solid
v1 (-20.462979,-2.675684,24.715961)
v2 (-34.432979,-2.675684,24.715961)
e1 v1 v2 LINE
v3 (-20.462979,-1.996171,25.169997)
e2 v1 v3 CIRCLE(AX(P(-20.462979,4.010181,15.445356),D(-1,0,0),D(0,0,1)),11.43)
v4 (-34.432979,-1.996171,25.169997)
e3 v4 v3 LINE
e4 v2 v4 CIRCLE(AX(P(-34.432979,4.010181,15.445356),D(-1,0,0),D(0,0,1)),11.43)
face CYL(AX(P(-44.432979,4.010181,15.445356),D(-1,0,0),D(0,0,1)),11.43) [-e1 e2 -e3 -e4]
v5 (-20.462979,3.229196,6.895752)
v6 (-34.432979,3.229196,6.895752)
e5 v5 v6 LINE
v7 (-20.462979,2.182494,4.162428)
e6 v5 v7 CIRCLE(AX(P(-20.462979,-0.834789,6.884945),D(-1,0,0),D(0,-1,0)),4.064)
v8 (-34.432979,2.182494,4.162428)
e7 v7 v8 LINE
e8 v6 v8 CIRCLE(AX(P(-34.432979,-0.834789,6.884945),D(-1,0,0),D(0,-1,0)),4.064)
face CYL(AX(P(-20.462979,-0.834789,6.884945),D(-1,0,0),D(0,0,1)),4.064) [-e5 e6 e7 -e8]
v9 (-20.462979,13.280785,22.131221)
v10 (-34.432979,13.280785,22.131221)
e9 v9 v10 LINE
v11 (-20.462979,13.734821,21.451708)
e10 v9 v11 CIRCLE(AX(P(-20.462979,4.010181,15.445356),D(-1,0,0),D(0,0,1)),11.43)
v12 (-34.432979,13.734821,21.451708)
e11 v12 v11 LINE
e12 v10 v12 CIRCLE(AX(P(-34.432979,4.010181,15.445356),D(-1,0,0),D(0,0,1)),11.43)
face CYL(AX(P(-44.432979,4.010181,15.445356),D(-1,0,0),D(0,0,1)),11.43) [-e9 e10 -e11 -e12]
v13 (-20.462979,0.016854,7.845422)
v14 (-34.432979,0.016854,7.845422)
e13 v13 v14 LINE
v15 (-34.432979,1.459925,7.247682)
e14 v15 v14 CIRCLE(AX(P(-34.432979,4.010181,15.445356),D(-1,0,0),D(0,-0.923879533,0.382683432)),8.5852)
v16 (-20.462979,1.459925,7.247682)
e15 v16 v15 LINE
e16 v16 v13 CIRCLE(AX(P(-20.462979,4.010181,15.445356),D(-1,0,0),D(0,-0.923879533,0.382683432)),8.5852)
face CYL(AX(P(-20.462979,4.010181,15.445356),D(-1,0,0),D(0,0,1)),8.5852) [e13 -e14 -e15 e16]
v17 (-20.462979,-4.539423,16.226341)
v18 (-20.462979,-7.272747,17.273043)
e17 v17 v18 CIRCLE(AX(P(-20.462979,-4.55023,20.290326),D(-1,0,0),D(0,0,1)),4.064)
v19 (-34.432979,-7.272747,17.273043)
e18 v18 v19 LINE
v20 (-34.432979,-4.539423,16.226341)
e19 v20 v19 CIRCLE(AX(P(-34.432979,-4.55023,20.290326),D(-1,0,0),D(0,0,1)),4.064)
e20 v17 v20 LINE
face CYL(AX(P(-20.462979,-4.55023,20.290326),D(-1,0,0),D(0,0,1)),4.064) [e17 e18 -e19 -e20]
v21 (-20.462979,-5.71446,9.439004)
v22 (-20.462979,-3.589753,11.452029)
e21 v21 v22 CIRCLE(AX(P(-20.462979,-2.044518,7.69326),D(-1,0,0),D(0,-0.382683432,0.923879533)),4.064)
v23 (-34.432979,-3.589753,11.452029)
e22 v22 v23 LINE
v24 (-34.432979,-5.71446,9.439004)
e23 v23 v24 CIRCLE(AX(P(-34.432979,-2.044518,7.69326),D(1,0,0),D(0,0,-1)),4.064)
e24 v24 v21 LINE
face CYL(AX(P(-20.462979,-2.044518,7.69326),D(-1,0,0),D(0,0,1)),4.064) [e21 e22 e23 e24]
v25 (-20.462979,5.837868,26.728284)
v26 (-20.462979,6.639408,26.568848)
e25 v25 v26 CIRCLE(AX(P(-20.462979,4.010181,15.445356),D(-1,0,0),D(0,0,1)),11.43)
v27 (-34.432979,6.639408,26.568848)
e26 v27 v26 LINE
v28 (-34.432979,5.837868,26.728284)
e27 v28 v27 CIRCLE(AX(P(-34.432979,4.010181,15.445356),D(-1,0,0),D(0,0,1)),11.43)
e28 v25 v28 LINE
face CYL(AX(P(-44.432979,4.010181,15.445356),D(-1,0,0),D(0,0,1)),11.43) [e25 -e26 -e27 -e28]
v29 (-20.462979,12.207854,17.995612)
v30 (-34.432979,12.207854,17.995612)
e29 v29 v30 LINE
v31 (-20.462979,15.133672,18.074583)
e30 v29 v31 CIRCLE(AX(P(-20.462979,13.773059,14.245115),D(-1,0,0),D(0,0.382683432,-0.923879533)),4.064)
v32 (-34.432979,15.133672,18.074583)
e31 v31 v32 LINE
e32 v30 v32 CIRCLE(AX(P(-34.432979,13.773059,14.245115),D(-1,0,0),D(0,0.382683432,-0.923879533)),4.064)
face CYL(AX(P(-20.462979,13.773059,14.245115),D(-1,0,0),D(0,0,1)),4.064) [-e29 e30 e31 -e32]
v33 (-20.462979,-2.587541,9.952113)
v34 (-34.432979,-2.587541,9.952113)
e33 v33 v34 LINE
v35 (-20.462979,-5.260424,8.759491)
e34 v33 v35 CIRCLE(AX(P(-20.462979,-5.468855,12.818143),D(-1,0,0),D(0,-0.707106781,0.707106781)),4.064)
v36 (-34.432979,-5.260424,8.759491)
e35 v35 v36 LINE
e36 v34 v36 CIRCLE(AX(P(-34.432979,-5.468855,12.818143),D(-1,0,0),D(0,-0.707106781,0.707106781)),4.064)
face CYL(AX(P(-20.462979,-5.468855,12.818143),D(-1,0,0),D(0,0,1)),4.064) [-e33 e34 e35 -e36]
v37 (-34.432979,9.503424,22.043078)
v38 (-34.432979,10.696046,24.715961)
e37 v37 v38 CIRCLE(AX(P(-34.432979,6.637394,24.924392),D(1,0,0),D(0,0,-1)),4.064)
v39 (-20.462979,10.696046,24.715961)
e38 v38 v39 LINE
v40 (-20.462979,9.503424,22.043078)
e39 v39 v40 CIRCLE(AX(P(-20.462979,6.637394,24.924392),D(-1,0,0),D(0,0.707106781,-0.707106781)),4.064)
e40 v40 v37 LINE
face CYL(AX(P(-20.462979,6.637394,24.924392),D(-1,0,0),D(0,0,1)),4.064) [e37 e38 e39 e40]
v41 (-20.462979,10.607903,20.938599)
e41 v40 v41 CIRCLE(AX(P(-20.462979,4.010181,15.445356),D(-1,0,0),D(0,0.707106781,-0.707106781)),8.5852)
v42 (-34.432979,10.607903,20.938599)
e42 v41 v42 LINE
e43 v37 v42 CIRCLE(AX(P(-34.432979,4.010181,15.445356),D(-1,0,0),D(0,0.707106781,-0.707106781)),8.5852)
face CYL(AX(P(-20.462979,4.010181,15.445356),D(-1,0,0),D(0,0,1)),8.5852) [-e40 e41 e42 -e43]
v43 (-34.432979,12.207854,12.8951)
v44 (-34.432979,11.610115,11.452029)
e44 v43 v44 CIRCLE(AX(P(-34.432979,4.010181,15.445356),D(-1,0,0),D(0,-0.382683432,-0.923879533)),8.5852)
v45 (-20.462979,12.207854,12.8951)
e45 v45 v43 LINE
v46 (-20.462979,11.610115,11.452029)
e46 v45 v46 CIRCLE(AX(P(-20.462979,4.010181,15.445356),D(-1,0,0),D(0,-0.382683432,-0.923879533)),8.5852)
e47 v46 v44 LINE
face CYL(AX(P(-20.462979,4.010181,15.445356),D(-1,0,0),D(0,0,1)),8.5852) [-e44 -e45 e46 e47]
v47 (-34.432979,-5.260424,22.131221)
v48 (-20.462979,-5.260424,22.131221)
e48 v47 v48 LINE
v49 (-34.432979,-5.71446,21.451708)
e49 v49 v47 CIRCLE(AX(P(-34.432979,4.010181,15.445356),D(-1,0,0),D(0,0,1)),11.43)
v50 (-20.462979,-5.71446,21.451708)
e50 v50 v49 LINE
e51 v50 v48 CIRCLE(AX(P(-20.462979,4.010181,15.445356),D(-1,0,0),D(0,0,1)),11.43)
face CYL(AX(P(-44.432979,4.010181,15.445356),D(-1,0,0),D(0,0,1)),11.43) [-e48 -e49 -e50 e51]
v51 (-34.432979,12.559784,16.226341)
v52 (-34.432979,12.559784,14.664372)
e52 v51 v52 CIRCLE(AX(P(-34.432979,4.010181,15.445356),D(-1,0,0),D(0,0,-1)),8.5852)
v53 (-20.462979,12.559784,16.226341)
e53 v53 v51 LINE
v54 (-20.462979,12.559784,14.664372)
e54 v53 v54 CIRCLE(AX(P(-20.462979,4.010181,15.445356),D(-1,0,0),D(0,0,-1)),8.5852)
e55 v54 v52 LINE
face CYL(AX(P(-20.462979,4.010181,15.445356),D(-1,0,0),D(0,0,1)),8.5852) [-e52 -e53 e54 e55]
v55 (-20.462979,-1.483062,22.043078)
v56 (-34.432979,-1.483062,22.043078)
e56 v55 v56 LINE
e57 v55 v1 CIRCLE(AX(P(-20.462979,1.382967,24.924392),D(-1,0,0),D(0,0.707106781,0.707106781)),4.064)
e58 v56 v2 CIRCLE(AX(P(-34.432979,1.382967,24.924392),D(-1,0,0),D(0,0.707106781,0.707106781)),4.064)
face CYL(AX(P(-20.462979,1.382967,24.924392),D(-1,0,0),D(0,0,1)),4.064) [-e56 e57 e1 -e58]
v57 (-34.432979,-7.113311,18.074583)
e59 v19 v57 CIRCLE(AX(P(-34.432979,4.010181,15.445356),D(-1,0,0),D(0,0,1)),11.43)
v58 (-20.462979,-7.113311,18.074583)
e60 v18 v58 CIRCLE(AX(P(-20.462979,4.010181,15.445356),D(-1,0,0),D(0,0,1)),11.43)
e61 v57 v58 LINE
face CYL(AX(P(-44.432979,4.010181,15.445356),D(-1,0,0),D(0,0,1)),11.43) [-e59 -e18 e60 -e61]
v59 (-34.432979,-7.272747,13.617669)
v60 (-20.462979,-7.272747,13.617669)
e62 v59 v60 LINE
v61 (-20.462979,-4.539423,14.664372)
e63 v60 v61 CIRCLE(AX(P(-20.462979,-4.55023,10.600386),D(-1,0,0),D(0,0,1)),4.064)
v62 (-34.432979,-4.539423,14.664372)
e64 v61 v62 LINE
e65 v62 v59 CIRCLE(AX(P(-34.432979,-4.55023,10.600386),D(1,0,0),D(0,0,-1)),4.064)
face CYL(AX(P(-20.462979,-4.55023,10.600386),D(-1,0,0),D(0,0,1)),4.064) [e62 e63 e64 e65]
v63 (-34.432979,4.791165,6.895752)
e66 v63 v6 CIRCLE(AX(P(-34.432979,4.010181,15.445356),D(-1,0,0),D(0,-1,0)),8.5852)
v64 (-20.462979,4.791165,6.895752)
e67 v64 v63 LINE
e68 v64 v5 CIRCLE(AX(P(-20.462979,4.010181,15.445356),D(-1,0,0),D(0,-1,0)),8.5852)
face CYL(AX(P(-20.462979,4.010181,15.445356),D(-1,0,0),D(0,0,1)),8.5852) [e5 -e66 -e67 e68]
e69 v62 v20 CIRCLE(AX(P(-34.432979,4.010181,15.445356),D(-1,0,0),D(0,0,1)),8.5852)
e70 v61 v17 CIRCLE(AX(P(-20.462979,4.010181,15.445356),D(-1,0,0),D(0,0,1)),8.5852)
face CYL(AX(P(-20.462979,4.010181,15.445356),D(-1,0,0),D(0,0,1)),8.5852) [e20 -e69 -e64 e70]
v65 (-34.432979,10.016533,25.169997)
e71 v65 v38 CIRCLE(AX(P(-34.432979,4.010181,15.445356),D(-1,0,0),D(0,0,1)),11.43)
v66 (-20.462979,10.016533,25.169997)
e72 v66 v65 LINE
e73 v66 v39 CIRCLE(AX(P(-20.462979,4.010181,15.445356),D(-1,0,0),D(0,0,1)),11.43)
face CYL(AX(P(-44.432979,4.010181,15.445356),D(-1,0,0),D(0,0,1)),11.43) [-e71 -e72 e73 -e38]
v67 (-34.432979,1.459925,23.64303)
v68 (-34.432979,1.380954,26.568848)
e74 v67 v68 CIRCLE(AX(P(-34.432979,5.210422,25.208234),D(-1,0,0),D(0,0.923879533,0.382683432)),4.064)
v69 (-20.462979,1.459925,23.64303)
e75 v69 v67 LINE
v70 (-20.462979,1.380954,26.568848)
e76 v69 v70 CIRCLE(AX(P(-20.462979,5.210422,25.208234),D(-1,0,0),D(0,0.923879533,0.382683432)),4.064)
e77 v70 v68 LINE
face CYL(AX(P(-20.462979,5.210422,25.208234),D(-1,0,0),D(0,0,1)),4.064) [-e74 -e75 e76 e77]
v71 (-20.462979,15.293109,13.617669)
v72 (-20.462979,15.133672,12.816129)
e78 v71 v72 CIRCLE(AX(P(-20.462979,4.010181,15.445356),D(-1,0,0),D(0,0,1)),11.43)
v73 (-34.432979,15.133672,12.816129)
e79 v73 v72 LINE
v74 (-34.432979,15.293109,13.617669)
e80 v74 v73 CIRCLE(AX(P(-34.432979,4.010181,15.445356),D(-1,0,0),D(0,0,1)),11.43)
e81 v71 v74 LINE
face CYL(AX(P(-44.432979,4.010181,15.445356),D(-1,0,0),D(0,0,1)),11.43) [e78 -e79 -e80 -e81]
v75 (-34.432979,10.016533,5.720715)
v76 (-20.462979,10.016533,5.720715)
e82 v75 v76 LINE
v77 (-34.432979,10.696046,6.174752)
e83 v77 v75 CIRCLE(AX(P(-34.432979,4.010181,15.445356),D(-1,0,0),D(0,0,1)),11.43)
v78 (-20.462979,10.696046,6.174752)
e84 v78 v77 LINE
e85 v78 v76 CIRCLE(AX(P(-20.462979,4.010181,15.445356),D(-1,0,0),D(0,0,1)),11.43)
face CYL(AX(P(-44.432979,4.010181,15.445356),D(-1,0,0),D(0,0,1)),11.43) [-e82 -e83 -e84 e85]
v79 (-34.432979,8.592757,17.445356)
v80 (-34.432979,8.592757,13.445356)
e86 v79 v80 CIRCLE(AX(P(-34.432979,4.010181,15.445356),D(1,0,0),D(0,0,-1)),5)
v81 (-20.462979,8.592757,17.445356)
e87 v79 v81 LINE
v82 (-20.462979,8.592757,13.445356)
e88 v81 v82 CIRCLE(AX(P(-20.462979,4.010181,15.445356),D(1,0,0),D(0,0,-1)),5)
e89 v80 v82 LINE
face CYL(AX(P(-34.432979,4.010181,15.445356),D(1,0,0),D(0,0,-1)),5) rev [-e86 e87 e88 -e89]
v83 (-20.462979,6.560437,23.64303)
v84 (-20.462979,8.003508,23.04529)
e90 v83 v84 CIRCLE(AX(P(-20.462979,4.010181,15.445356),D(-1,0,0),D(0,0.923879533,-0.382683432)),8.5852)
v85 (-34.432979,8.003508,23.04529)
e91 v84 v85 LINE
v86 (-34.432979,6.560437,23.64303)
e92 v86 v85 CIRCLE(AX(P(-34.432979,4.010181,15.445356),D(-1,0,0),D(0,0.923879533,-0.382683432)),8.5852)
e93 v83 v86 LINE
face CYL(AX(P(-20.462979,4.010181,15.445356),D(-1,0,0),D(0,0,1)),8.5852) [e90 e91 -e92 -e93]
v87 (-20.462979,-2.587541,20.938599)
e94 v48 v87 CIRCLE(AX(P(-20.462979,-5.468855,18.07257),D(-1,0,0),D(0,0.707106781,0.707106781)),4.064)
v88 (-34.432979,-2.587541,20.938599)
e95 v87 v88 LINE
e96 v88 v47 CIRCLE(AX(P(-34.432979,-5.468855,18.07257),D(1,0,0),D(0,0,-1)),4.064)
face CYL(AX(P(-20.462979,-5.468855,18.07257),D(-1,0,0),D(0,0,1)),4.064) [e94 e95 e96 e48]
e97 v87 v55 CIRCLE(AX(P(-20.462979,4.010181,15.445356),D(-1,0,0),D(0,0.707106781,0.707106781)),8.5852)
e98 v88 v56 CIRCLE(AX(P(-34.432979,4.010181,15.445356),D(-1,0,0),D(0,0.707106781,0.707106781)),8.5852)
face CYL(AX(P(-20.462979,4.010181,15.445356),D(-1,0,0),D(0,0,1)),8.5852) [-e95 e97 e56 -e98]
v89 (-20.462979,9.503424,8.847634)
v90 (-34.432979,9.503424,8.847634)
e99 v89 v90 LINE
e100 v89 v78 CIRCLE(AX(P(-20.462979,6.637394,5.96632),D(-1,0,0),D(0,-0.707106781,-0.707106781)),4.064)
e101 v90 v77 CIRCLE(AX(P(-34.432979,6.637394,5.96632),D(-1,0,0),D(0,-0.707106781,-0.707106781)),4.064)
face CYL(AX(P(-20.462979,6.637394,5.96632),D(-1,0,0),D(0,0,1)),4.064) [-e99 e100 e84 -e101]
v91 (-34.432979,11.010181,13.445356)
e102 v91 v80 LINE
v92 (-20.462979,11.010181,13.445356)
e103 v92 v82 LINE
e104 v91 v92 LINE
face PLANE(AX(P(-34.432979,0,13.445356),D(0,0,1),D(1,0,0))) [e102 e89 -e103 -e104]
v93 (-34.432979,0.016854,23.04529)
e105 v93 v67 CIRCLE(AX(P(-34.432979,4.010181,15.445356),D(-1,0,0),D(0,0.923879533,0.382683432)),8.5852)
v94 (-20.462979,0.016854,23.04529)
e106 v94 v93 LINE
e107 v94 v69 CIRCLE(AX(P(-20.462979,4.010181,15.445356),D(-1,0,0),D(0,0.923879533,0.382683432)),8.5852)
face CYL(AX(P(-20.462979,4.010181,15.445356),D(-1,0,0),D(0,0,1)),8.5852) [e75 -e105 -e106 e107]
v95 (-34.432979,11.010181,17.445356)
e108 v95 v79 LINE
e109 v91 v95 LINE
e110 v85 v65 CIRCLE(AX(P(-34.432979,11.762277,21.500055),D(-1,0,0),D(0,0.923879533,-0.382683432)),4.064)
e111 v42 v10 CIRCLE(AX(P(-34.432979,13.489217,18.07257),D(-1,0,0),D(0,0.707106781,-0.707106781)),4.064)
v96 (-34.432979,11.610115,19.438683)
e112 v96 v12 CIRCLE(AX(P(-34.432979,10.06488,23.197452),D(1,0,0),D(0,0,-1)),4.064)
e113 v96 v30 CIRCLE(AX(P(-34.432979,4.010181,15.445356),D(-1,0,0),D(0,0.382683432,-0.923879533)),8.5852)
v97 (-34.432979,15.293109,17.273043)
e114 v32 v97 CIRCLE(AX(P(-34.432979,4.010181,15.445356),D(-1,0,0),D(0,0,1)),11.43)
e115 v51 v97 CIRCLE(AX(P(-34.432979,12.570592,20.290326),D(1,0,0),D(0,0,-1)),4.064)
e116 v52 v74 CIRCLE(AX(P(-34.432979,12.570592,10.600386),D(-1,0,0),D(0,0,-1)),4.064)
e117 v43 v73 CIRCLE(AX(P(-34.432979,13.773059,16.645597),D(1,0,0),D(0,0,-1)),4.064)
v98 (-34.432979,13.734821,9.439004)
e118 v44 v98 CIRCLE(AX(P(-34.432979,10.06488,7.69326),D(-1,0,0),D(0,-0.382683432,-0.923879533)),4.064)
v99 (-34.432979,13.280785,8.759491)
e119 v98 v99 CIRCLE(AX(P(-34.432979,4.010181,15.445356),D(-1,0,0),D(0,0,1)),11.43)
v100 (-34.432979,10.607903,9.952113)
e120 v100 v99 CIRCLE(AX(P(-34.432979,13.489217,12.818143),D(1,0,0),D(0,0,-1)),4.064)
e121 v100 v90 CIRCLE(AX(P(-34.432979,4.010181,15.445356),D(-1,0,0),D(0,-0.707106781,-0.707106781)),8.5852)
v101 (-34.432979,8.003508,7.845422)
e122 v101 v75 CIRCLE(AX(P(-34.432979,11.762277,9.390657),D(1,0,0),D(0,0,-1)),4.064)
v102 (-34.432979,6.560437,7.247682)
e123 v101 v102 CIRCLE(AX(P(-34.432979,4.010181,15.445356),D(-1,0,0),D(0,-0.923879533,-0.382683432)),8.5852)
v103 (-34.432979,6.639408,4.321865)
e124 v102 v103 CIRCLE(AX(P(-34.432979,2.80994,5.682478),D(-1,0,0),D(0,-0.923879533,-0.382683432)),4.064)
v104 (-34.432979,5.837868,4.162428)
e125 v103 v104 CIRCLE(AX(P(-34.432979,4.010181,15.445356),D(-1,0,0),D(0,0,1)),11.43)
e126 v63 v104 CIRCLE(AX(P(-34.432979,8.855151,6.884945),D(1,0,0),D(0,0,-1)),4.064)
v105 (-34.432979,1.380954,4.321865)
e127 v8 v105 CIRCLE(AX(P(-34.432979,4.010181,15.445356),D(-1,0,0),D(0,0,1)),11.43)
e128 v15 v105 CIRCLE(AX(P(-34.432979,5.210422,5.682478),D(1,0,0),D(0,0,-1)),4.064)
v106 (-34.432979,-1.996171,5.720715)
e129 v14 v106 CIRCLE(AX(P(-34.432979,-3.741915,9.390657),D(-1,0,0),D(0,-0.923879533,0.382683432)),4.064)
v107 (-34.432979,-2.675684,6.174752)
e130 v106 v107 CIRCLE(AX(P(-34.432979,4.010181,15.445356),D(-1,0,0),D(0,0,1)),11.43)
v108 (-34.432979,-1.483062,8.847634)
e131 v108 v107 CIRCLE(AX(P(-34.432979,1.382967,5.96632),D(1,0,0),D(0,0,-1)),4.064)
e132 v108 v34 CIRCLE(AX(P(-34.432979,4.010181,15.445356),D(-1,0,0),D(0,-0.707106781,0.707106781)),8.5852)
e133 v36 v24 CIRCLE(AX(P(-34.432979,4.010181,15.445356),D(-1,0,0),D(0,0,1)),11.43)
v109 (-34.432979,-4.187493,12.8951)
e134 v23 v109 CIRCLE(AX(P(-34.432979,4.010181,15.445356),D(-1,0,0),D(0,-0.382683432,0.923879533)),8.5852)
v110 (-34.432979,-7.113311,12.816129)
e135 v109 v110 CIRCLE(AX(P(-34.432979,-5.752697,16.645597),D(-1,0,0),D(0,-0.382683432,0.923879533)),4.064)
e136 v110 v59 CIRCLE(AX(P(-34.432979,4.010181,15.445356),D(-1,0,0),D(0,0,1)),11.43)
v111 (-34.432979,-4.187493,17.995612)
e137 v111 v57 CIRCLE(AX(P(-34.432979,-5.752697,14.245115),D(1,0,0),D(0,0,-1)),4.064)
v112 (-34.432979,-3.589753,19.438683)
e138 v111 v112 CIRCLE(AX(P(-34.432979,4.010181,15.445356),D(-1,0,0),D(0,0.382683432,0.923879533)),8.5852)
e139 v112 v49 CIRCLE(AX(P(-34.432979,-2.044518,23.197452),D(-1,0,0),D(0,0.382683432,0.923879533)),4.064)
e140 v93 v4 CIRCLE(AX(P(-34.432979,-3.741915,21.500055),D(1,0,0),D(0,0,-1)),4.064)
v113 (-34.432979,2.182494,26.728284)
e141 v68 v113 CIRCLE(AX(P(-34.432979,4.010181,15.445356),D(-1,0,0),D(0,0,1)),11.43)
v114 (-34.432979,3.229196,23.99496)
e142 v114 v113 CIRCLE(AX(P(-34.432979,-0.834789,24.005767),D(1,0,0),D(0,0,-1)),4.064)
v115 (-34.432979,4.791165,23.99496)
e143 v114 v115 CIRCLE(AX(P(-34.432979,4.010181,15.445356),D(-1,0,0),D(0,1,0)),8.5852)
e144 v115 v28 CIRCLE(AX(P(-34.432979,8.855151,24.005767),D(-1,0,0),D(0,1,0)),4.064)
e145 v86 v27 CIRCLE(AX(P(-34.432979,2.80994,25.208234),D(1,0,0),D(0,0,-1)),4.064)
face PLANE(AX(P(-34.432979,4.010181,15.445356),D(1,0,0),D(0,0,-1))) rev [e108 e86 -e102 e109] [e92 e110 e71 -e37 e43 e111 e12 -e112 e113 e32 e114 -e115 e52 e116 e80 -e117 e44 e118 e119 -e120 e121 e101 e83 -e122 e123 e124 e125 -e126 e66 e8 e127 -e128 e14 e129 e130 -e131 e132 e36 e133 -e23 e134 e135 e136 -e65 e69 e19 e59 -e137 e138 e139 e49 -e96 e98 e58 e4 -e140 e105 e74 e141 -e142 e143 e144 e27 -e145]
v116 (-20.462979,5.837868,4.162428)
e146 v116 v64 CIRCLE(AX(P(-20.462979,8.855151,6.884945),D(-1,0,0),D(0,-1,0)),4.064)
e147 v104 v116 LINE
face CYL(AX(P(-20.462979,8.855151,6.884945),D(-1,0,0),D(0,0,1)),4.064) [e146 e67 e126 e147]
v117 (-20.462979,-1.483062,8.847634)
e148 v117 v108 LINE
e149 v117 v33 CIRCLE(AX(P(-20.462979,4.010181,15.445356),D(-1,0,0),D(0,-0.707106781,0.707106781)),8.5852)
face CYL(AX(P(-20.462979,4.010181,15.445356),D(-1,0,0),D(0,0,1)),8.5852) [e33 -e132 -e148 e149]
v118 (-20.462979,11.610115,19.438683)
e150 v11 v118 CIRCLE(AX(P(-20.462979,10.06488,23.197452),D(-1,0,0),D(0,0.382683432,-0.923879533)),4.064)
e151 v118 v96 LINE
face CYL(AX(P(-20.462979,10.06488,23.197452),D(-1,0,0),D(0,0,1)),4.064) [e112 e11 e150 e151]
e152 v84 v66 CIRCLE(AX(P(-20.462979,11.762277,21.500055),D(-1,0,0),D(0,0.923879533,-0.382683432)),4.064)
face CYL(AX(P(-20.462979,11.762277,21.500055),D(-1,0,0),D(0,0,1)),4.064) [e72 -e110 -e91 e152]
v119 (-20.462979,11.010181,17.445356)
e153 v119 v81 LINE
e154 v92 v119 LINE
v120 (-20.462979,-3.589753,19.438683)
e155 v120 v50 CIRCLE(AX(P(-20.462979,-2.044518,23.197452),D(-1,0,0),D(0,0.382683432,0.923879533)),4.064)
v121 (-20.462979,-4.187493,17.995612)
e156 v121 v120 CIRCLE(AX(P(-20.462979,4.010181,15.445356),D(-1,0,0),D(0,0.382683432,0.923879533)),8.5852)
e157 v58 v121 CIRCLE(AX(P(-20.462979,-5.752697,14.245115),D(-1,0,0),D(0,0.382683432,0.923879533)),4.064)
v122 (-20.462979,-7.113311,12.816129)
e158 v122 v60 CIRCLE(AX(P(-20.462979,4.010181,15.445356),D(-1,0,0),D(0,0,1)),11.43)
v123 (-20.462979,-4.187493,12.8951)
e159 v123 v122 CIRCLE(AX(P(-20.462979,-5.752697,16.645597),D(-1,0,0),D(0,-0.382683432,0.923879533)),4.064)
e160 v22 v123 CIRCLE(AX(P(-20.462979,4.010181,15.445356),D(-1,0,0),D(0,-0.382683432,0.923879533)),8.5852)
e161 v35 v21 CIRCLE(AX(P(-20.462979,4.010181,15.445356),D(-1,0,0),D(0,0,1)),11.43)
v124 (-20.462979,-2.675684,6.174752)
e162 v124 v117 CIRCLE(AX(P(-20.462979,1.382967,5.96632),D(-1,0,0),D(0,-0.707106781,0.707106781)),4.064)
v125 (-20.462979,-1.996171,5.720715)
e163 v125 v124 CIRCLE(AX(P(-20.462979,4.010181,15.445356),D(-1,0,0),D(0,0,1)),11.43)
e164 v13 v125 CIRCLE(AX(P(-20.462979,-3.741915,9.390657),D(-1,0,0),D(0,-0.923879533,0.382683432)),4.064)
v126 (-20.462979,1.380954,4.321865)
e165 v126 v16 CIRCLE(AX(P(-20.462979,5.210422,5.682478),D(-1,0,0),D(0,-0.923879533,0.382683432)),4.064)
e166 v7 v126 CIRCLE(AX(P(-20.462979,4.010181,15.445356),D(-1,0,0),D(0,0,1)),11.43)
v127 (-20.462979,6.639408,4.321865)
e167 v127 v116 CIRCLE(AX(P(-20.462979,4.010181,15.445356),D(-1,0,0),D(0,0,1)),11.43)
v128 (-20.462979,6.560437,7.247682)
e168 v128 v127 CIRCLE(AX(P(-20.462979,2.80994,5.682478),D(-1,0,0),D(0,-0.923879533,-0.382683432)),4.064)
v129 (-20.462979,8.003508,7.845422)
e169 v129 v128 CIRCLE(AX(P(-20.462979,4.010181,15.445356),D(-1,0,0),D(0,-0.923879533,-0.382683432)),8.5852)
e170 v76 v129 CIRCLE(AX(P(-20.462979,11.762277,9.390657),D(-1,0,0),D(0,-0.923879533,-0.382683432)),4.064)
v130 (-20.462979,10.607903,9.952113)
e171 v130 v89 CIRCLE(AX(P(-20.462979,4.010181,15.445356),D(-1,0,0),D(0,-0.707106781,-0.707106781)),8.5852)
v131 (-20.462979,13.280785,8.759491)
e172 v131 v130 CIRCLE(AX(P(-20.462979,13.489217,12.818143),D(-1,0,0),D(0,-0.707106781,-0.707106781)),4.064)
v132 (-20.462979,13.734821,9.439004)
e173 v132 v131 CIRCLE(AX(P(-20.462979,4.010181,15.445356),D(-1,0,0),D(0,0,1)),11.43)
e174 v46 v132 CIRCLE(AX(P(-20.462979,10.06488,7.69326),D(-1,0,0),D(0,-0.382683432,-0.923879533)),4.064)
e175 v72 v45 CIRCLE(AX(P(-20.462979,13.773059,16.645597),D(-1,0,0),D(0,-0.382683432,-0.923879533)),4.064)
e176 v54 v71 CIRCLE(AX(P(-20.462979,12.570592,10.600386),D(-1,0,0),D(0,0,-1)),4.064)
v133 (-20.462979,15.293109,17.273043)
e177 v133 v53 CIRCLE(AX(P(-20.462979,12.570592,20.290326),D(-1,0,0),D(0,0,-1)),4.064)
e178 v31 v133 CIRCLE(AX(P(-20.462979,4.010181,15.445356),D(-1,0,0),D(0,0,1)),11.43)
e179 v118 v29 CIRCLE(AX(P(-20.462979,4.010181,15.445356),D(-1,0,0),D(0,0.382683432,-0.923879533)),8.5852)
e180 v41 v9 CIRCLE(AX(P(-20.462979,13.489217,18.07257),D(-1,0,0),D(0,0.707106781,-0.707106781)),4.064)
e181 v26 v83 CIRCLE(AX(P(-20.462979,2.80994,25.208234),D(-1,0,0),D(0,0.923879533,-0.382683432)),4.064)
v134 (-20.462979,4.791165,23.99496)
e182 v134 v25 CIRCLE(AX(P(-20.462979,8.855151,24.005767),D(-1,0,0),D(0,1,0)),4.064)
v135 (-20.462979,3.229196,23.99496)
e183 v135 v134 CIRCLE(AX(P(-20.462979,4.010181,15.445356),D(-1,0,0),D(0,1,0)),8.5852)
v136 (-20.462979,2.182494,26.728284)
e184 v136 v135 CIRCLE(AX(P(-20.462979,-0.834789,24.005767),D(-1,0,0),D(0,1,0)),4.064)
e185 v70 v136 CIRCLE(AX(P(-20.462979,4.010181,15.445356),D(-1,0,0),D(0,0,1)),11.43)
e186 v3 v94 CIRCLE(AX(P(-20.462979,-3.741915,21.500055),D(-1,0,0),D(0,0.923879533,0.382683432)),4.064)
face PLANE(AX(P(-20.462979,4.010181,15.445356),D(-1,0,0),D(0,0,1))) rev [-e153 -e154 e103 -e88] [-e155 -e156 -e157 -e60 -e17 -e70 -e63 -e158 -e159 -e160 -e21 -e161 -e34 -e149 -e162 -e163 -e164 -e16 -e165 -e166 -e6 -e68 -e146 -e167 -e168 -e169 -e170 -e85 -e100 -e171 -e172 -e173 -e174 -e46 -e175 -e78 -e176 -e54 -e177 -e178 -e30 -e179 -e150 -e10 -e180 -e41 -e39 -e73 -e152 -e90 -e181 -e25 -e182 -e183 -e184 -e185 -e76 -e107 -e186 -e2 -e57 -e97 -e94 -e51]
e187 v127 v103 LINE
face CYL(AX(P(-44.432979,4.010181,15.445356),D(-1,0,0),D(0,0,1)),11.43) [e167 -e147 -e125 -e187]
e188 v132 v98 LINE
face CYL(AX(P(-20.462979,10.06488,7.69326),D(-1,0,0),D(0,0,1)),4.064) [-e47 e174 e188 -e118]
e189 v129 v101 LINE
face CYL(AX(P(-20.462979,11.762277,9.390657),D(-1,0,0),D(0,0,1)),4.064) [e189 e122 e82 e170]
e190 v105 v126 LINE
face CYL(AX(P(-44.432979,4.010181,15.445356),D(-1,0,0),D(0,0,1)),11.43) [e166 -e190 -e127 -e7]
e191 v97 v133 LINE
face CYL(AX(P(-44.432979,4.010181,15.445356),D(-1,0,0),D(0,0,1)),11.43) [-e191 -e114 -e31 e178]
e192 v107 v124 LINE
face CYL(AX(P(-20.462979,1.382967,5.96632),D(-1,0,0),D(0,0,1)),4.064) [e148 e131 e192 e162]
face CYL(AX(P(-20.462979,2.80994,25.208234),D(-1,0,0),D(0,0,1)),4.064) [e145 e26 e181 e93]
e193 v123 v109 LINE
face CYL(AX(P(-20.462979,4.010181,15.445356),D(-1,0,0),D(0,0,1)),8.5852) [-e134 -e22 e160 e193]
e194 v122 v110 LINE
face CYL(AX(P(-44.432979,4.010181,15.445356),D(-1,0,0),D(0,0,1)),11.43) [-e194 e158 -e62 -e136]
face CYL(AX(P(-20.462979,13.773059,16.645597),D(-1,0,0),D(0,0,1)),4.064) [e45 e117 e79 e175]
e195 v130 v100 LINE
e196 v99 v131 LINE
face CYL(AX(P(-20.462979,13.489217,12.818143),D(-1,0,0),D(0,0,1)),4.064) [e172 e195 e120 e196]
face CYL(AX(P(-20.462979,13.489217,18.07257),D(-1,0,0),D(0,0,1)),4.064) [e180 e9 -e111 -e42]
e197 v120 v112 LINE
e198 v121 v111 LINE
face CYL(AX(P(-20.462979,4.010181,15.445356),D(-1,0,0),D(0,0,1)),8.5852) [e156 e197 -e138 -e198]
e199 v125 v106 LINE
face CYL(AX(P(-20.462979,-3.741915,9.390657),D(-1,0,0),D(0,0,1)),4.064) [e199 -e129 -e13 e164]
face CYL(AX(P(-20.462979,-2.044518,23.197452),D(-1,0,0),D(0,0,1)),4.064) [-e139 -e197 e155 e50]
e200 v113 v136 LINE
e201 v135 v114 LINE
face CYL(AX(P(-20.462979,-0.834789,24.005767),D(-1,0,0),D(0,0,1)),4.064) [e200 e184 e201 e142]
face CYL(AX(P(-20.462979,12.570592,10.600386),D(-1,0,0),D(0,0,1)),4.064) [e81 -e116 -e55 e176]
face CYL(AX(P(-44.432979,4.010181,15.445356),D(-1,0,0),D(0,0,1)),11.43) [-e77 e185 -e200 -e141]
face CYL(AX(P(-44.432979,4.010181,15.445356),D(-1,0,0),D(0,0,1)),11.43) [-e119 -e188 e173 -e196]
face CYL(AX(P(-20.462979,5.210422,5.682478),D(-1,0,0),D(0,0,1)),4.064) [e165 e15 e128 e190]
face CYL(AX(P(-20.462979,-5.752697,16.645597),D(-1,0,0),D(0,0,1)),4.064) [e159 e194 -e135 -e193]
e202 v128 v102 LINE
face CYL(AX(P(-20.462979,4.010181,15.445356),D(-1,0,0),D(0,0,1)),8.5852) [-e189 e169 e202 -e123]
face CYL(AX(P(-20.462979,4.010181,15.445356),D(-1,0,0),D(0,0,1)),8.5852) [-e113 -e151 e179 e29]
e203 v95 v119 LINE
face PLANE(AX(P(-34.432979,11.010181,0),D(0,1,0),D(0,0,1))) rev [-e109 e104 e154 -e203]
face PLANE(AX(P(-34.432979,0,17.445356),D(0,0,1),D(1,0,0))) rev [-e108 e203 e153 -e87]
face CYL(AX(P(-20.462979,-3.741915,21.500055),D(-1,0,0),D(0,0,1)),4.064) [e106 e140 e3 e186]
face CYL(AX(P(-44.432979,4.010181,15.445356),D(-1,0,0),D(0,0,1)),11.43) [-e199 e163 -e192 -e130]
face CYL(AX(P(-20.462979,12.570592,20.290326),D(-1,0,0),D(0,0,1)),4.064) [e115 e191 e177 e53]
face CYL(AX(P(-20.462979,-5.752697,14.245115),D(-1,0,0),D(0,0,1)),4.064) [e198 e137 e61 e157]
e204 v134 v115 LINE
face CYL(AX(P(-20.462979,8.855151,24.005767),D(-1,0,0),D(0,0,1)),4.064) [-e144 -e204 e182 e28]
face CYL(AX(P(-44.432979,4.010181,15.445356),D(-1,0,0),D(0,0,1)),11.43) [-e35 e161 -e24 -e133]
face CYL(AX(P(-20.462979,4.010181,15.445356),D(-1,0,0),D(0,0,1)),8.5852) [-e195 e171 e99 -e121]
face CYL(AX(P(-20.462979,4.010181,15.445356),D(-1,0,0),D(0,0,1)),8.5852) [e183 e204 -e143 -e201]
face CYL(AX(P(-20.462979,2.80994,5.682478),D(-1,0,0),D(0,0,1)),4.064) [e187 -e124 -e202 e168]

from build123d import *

# Parameters (mm, degrees)
SPUR_START             = -34.432979129
SPUR_GEAR_AI_OUTLINE_R = 4.7625
SPUR_GEAR_AI_DEPTH     = 13.97
CUT_EXTRUDE1_DEPTH     = 34.814807958


# Read off the part's stored shape, not the designer's step: spur gear_ai
with BuildPart() as part:
    # spur gear_ai outline → spur gear_ai (new body)
    with BuildSketch(Plane.YZ.offset(SPUR_START)):
        with BuildLine():
            ThreePointArc((13.280785394, 8.759491053), (13.513878524, 9.095188342), (13.734821499, 9.439004105))
            ThreePointArc((13.734821499, 9.439004105), (12.859979854, 10.643431253), (11.610114863, 11.452028906))
            ThreePointArc((11.610114863, 11.452028906), (11.941871418, 12.159942302), (12.207854471, 12.895099975))
            ThreePointArc((12.207854471, 12.895099975), (13.663407365, 12.583076847), (15.133672429, 12.816128991))
            ThreePointArc((15.133672429, 12.816128991), (15.220556611, 13.215473725), (15.293108707, 13.617669288))
            ThreePointArc((15.293108707, 13.617669288), (14.023946102, 14.395627475), (12.559784493, 14.664371671))
            ThreePointArc((12.559784493, 14.664371671), (12.595380856, 15.445356105), (12.559784493, 16.22634054))
            ThreePointArc((12.559784493, 16.22634054), (14.023946102, 16.495084736), (15.293108707, 17.273042923))
            ThreePointArc((15.293108707, 17.273042923), (15.220556611, 17.675238486), (15.133672429, 18.07458322))
            ThreePointArc((15.133672429, 18.07458322), (13.663407365, 18.307635364), (12.207854471, 17.995612236))
            ThreePointArc((12.207854471, 17.995612236), (11.941871418, 18.730769909), (11.610114863, 19.438683305))
            ThreePointArc((11.610114863, 19.438683305), (12.859979854, 20.247280957), (13.734821499, 21.451708106))
            ThreePointArc((13.734821499, 21.451708106), (13.513878524, 21.795523869), (13.280785394, 22.131221158))
            ThreePointArc((13.280785394, 22.131221158), (11.8332524, 21.783887183), (10.607902954, 20.938599424))
            ThreePointArc((10.607902954, 20.938599424), (10.080833993, 21.516009243), (9.503424174, 22.043078204))
            ThreePointArc((9.503424174, 22.043078204), (10.348711933, 23.26842765), (10.696045908, 24.715960644))
            ThreePointArc((10.696045908, 24.715960644), (10.360348619, 24.949053774), (10.016532856, 25.169996749))
            ThreePointArc((10.016532856, 25.169996749), (8.812105708, 24.295155104), (8.003508055, 23.045290113))
            ThreePointArc((8.003508055, 23.045290113), (7.295594659, 23.377046668), (6.560436986, 23.643029721))
            ThreePointArc((6.560436986, 23.643029721), (6.872460114, 25.098582615), (6.63940797, 26.568847679))
            ThreePointArc((6.63940797, 26.568847679), (6.240063236, 26.65573186), (5.837867673, 26.728283957))
            ThreePointArc((5.837867673, 26.728283957), (5.059909486, 25.459121352), (4.79116529, 23.994959743))
            ThreePointArc((4.79116529, 23.994959743), (4.010180856, 24.030556105), (3.229196421, 23.994959743))
            ThreePointArc((3.229196421, 23.994959743), (2.960452225, 25.459121352), (2.182494038, 26.728283957))
            ThreePointArc((2.182494038, 26.728283957), (1.780298475, 26.65573186), (1.380953741, 26.568847679))
            ThreePointArc((1.380953741, 26.568847679), (1.147901597, 25.098582615), (1.459924725, 23.643029721))
            ThreePointArc((1.459924725, 23.643029721), (0.724767052, 23.377046668), (0.016853656, 23.045290113))
            ThreePointArc((0.016853656, 23.045290113), (-0.791743997, 24.295155104), (-1.996171145, 25.169996749))
            ThreePointArc((-1.996171145, 25.169996749), (-2.339986908, 24.949053774), (-2.675684197, 24.715960644))
            ThreePointArc((-2.675684197, 24.715960644), (-2.328350222, 23.26842765), (-1.483062463, 22.043078204))
            ThreePointArc((-1.483062463, 22.043078204), (-2.060472282, 21.516009243), (-2.587541243, 20.938599424))
            ThreePointArc((-2.587541243, 20.938599424), (-3.812890689, 21.783887183), (-5.260423683, 22.131221158))
            ThreePointArc((-5.260423683, 22.131221158), (-5.493516813, 21.795523869), (-5.714459788, 21.451708106))
            ThreePointArc((-5.714459788, 21.451708106), (-4.839618143, 20.247280957), (-3.589753152, 19.438683305))
            ThreePointArc((-3.589753152, 19.438683305), (-3.921509707, 18.730769909), (-4.18749276, 17.995612236))
            ThreePointArc((-4.18749276, 17.995612236), (-5.643045654, 18.307635364), (-7.113310718, 18.07458322))
            ThreePointArc((-7.113310718, 18.07458322), (-7.200194899, 17.675238486), (-7.272746996, 17.273042923))
            ThreePointArc((-7.272746996, 17.273042923), (-6.003584391, 16.495084736), (-4.539422782, 16.22634054))
            ThreePointArc((-4.539422782, 16.22634054), (-4.575019144, 15.445356106), (-4.539422782, 14.664371671))
            ThreePointArc((-4.539422782, 14.664371671), (-6.003584391, 14.395627475), (-7.272746996, 13.617669288))
            ThreePointArc((-7.272746996, 13.617669288), (-7.200194899, 13.215473725), (-7.113310718, 12.816128991))
            ThreePointArc((-7.113310718, 12.816128991), (-5.643045654, 12.583076847), (-4.18749276, 12.895099975))
            ThreePointArc((-4.18749276, 12.895099975), (-3.921509707, 12.159942302), (-3.589753152, 11.452028906))
            ThreePointArc((-3.589753152, 11.452028906), (-4.839618143, 10.643431253), (-5.714459788, 9.439004105))
            ThreePointArc((-5.714459788, 9.439004105), (-5.493516813, 9.095188342), (-5.260423683, 8.759491053))
            ThreePointArc((-5.260423683, 8.759491053), (-3.812890689, 9.106825028), (-2.587541243, 9.952112787))
            ThreePointArc((-2.587541243, 9.952112787), (-2.060472282, 9.374702968), (-1.483062463, 8.847634007))
            ThreePointArc((-1.483062463, 8.847634007), (-2.328350222, 7.622284561), (-2.675684197, 6.174751567))
            ThreePointArc((-2.675684197, 6.174751567), (-2.339986908, 5.941658437), (-1.996171145, 5.720715462))
            ThreePointArc((-1.996171145, 5.720715462), (-0.791743997, 6.595557107), (0.016853656, 7.845422098))
            ThreePointArc((0.016853656, 7.845422098), (0.724767052, 7.513665543), (1.459924725, 7.24768249))
            ThreePointArc((1.459924725, 7.24768249), (1.147901597, 5.792129596), (1.380953741, 4.321864532))
            ThreePointArc((1.380953741, 4.321864532), (1.780298475, 4.23498035), (2.182494038, 4.162428254))
            ThreePointArc((2.182494038, 4.162428254), (2.960452225, 5.431590859), (3.229196421, 6.895752468))
            ThreePointArc((3.229196421, 6.895752468), (4.010180855, 6.860156105), (4.79116529, 6.895752468))
            ThreePointArc((4.79116529, 6.895752468), (5.059909486, 5.431590859), (5.837867673, 4.162428254))
            ThreePointArc((5.837867673, 4.162428254), (6.240063236, 4.23498035), (6.63940797, 4.321864532))
            ThreePointArc((6.63940797, 4.321864532), (6.872460114, 5.792129596), (6.560436986, 7.24768249))
            ThreePointArc((6.560436986, 7.24768249), (7.295594659, 7.513665543), (8.003508055, 7.845422098))
            ThreePointArc((8.003508055, 7.845422098), (8.812105708, 6.595557107), (10.016532856, 5.720715462))
            ThreePointArc((10.016532856, 5.720715462), (10.360348619, 5.941658437), (10.696045908, 6.174751567))
            ThreePointArc((10.696045908, 6.174751567), (10.348711933, 7.622284561), (9.503424174, 8.847634007))
            ThreePointArc((9.503424174, 8.847634007), (10.080833993, 9.374702968), (10.607902954, 9.952112787))
            ThreePointArc((10.607902954, 9.952112787), (11.8332524, 9.106825028), (13.280785394, 8.759491053))
        make_face()
        with Locations((4.010180856, 15.445356105)):
            Circle(SPUR_GEAR_AI_OUTLINE_R, mode=Mode.SUBTRACT)
    extrude(amount=SPUR_GEAR_AI_DEPTH)

    # Sketch1 → Cut-Extrude1 (cut, through all)
    with BuildSketch(Plane(origin=(-20.462979129, 0, 0), x_dir=(0, 0, -1), z_dir=(1, 0, 0))):
        with BuildLine():
            Line((-13.445356105, 8.59275655), (-13.445356105, 11.010180856))
            Line((-13.445356105, 11.010180856), (-17.445356105, 11.010180856))
            Line((-17.445356105, 11.010180856), (-17.445356105, 8.59275655))
            ThreePointArc((-17.445356105, 8.59275655), (-15.445356105, 9.010180856), (-13.445356105, 8.59275655))
        make_face()
        with BuildLine():
            ThreePointArc((-10.445356105, 4.010180856), (-11.262055973, 6.748793643), (-13.445356105, 8.59275655))
            Line((-13.445356105, 8.59275655), (-13.445356105, 7.010180856))
            Line((-13.445356105, 7.010180856), (-17.445356105, 7.010180856))
            Line((-17.445356105, 7.010180856), (-17.445356105, 8.59275655))
            ThreePointArc((-17.445356105, 8.59275655), (-18.183968893, -0.173119277), (-10.445356105, 4.010180856))
        make_face()
        with BuildLine():
            Line((-13.445356105, 7.010180856), (-13.445356105, 8.59275655))
            ThreePointArc((-13.445356105, 8.59275655), (-15.445356105, 9.010180856), (-17.445356105, 8.59275655))
            Line((-17.445356105, 8.59275655), (-17.445356105, 7.010180856))
            Line((-17.445356105, 7.010180856), (-13.445356105, 7.010180856))
        make_face()
    extrude(amount=-CUT_EXTRUDE1_DEPTH, mode=Mode.SUBTRACT)


solid = part.part
